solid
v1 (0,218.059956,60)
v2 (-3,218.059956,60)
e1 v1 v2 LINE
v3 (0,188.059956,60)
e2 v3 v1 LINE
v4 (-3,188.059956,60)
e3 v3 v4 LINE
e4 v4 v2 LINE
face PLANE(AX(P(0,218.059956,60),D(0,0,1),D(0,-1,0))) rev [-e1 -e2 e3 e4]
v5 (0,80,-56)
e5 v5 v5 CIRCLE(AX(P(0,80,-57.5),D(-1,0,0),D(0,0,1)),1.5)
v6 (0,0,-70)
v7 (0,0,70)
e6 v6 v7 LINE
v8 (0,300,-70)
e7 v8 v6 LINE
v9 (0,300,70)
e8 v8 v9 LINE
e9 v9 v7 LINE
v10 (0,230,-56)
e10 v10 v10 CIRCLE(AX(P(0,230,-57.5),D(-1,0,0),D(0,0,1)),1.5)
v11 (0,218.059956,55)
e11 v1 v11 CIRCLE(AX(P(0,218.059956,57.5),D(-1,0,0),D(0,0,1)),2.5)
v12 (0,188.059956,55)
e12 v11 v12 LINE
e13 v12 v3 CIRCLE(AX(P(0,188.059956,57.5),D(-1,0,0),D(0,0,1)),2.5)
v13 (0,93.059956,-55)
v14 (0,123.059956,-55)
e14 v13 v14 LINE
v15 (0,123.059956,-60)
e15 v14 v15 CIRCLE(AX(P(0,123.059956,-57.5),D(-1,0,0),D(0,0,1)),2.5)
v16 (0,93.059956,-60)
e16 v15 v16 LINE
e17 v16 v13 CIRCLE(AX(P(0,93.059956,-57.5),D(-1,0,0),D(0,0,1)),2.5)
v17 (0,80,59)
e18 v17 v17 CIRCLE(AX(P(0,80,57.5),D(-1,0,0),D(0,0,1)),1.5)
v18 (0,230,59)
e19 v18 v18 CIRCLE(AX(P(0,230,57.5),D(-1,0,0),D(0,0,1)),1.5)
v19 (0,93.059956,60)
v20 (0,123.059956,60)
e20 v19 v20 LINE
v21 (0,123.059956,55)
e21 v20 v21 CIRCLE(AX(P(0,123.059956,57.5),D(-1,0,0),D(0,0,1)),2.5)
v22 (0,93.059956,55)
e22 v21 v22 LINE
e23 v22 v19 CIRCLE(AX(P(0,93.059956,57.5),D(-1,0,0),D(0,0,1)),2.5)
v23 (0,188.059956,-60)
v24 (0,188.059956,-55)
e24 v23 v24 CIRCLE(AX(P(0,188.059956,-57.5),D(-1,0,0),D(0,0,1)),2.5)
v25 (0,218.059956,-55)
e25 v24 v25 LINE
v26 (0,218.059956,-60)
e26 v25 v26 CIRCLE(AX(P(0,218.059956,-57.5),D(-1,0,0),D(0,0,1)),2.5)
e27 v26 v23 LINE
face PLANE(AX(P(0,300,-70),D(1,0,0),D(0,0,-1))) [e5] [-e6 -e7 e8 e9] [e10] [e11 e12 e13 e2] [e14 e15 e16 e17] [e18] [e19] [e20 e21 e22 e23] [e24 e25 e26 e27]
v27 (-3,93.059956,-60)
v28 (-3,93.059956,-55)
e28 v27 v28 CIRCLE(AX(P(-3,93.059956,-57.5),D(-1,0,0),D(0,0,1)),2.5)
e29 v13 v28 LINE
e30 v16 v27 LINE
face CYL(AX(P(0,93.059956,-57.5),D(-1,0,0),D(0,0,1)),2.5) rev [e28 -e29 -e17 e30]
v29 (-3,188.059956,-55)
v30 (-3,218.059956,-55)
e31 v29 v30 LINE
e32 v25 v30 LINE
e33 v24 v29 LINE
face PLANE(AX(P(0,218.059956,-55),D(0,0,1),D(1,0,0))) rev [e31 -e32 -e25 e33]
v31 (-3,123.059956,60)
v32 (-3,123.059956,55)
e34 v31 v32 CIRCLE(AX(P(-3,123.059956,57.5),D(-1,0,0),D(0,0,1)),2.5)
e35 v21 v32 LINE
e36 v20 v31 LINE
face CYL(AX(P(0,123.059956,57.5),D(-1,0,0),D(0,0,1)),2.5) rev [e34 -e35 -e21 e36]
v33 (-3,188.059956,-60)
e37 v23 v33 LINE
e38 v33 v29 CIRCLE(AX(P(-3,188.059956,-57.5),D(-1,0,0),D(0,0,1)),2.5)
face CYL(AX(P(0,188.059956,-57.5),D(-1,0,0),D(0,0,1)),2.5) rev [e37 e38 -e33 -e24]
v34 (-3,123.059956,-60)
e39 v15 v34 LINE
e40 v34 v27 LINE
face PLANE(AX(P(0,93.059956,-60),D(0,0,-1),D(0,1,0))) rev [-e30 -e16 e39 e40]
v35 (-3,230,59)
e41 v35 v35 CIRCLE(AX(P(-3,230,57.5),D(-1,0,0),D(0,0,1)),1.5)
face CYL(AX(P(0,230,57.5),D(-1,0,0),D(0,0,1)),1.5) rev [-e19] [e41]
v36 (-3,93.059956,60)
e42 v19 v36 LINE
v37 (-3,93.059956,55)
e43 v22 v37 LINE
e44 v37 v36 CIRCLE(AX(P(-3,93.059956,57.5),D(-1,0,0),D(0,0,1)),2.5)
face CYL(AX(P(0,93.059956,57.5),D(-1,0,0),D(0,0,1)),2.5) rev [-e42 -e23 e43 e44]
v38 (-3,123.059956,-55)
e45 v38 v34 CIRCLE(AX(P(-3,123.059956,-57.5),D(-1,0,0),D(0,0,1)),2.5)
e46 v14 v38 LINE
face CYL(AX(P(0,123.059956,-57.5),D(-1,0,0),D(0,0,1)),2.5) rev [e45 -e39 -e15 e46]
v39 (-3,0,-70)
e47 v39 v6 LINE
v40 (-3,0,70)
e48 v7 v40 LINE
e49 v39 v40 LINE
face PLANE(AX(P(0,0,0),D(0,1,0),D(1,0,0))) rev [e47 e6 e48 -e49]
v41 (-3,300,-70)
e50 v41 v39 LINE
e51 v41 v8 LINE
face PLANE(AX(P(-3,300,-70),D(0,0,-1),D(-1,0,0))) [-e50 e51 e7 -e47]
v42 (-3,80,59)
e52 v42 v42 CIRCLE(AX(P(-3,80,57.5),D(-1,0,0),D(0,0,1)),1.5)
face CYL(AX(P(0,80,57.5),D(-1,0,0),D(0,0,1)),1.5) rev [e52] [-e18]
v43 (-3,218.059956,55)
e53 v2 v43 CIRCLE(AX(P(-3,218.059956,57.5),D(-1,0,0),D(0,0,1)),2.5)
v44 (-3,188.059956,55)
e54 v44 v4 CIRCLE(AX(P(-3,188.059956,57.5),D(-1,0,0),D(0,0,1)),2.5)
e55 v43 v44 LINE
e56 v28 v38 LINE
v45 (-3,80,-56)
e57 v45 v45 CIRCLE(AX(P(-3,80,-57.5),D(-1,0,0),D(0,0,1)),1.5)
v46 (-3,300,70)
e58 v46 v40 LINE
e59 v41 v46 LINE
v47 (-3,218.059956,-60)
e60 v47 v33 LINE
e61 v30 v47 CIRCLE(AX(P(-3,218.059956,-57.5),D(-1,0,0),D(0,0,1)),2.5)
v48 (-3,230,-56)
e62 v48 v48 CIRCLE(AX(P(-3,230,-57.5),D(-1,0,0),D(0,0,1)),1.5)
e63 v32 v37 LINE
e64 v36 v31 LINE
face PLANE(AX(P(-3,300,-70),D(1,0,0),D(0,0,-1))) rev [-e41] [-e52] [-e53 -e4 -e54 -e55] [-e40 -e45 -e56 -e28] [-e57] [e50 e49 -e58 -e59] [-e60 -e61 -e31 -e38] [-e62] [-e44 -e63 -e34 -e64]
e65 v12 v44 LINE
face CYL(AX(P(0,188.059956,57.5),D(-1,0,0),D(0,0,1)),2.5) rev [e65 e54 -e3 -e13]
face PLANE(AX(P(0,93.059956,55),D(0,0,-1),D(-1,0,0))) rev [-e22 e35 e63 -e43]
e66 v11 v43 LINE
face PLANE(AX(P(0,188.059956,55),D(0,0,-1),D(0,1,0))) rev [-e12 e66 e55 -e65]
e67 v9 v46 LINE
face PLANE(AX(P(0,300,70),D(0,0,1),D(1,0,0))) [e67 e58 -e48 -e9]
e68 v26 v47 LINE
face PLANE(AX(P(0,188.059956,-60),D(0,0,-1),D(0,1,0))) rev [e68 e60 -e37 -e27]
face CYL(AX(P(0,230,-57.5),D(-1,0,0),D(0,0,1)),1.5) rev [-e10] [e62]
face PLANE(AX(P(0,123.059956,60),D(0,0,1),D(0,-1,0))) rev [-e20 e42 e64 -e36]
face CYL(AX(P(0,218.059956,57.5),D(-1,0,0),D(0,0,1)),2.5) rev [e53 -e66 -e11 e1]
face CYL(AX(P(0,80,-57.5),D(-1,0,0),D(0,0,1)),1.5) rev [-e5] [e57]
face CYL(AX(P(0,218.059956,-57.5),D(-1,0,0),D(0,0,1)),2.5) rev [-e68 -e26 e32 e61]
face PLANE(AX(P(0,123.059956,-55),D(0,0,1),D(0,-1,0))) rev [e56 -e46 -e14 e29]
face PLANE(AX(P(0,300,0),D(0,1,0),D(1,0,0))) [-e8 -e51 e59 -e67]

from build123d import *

# Parameters (mm, degrees)
BASE_FLANGE1_OUTLINE_W = 3
BASE_FLANGE1_OUTLINE_H = 140
BASE_FLANGE1_DEPTH     = 300
SKETCH11_R             = 1.5
CUT_EXTRUDE1_DEPTH     = 10
CUT_EXTRUDE2_DEPTH     = 10


# Read off the part's stored shape, not the designer's step: Base-Flange1
with BuildPart() as part:
    # Base-Flange1 outline → Base-Flange1 (new body)
    with BuildSketch(Plane(origin=(0, 0, 0), x_dir=(1, 0, 0), z_dir=(0, 1, 0))):
        with Locations((-1.5, 0)):
            Rectangle(BASE_FLANGE1_OUTLINE_W, BASE_FLANGE1_OUTLINE_H)
    extrude(amount=BASE_FLANGE1_DEPTH)

    # Sketch11 → Cut-Extrude1 (cut)
    with BuildSketch(Plane.ZY.offset(3)):
        with Locations((-57.5, 80)):
            Circle(SKETCH11_R)
        with Locations((57.5, 80)):
            Circle(SKETCH11_R)
        with Locations((-57.5, 230)):
            Circle(SKETCH11_R)
        with Locations((57.5, 230)):
            Circle(SKETCH11_R)
    extrude(amount=-CUT_EXTRUDE1_DEPTH, mode=Mode.SUBTRACT)

    # Sketch12 → Cut-Extrude2 (cut)
    with BuildSketch(Plane.ZY.offset(3)):
        with BuildLine():
            Line((-60, 93.059956427), (-60, 123.059956427))
            ThreePointArc((-60, 123.059956427), (-57.5, 125.559956427), (-55, 123.059956427))
            Line((-55, 123.059956427), (-55, 93.059956427))
            ThreePointArc((-55, 93.059956427), (-57.5, 90.559956427), (-60, 93.059956427))
        make_face()
        with BuildLine():
            Line((-60, 188.059956427), (-60, 218.059956427))
            ThreePointArc((-60, 218.059956427), (-57.5, 220.559956427), (-55, 218.059956427))
            Line((-55, 218.059956427), (-55, 188.059956427))
            ThreePointArc((-55, 188.059956427), (-57.5, 185.559956427), (-60, 188.059956427))
        make_face()
        with BuildLine():
            Line((55, 93.059956427), (55, 123.059956427))
            ThreePointArc((55, 123.059956427), (57.5, 125.559956427), (60, 123.059956427))
            Line((60, 123.059956427), (60, 93.059956427))
            ThreePointArc((60, 93.059956427), (57.5, 90.559956427), (55, 93.059956427))
        make_face()
        with BuildLine():
            Line((60, 218.059956427), (60, 188.059956427))
            ThreePointArc((60, 188.059956427), (57.5, 185.559956427), (55, 188.059956427))
            Line((55, 188.059956427), (55, 218.059956427))
            ThreePointArc((55, 218.059956427), (57.5, 220.559956427), (60, 218.059956427))
        make_face()
    extrude(amount=-CUT_EXTRUDE2_DEPTH, mode=Mode.SUBTRACT)


solid = part.part
